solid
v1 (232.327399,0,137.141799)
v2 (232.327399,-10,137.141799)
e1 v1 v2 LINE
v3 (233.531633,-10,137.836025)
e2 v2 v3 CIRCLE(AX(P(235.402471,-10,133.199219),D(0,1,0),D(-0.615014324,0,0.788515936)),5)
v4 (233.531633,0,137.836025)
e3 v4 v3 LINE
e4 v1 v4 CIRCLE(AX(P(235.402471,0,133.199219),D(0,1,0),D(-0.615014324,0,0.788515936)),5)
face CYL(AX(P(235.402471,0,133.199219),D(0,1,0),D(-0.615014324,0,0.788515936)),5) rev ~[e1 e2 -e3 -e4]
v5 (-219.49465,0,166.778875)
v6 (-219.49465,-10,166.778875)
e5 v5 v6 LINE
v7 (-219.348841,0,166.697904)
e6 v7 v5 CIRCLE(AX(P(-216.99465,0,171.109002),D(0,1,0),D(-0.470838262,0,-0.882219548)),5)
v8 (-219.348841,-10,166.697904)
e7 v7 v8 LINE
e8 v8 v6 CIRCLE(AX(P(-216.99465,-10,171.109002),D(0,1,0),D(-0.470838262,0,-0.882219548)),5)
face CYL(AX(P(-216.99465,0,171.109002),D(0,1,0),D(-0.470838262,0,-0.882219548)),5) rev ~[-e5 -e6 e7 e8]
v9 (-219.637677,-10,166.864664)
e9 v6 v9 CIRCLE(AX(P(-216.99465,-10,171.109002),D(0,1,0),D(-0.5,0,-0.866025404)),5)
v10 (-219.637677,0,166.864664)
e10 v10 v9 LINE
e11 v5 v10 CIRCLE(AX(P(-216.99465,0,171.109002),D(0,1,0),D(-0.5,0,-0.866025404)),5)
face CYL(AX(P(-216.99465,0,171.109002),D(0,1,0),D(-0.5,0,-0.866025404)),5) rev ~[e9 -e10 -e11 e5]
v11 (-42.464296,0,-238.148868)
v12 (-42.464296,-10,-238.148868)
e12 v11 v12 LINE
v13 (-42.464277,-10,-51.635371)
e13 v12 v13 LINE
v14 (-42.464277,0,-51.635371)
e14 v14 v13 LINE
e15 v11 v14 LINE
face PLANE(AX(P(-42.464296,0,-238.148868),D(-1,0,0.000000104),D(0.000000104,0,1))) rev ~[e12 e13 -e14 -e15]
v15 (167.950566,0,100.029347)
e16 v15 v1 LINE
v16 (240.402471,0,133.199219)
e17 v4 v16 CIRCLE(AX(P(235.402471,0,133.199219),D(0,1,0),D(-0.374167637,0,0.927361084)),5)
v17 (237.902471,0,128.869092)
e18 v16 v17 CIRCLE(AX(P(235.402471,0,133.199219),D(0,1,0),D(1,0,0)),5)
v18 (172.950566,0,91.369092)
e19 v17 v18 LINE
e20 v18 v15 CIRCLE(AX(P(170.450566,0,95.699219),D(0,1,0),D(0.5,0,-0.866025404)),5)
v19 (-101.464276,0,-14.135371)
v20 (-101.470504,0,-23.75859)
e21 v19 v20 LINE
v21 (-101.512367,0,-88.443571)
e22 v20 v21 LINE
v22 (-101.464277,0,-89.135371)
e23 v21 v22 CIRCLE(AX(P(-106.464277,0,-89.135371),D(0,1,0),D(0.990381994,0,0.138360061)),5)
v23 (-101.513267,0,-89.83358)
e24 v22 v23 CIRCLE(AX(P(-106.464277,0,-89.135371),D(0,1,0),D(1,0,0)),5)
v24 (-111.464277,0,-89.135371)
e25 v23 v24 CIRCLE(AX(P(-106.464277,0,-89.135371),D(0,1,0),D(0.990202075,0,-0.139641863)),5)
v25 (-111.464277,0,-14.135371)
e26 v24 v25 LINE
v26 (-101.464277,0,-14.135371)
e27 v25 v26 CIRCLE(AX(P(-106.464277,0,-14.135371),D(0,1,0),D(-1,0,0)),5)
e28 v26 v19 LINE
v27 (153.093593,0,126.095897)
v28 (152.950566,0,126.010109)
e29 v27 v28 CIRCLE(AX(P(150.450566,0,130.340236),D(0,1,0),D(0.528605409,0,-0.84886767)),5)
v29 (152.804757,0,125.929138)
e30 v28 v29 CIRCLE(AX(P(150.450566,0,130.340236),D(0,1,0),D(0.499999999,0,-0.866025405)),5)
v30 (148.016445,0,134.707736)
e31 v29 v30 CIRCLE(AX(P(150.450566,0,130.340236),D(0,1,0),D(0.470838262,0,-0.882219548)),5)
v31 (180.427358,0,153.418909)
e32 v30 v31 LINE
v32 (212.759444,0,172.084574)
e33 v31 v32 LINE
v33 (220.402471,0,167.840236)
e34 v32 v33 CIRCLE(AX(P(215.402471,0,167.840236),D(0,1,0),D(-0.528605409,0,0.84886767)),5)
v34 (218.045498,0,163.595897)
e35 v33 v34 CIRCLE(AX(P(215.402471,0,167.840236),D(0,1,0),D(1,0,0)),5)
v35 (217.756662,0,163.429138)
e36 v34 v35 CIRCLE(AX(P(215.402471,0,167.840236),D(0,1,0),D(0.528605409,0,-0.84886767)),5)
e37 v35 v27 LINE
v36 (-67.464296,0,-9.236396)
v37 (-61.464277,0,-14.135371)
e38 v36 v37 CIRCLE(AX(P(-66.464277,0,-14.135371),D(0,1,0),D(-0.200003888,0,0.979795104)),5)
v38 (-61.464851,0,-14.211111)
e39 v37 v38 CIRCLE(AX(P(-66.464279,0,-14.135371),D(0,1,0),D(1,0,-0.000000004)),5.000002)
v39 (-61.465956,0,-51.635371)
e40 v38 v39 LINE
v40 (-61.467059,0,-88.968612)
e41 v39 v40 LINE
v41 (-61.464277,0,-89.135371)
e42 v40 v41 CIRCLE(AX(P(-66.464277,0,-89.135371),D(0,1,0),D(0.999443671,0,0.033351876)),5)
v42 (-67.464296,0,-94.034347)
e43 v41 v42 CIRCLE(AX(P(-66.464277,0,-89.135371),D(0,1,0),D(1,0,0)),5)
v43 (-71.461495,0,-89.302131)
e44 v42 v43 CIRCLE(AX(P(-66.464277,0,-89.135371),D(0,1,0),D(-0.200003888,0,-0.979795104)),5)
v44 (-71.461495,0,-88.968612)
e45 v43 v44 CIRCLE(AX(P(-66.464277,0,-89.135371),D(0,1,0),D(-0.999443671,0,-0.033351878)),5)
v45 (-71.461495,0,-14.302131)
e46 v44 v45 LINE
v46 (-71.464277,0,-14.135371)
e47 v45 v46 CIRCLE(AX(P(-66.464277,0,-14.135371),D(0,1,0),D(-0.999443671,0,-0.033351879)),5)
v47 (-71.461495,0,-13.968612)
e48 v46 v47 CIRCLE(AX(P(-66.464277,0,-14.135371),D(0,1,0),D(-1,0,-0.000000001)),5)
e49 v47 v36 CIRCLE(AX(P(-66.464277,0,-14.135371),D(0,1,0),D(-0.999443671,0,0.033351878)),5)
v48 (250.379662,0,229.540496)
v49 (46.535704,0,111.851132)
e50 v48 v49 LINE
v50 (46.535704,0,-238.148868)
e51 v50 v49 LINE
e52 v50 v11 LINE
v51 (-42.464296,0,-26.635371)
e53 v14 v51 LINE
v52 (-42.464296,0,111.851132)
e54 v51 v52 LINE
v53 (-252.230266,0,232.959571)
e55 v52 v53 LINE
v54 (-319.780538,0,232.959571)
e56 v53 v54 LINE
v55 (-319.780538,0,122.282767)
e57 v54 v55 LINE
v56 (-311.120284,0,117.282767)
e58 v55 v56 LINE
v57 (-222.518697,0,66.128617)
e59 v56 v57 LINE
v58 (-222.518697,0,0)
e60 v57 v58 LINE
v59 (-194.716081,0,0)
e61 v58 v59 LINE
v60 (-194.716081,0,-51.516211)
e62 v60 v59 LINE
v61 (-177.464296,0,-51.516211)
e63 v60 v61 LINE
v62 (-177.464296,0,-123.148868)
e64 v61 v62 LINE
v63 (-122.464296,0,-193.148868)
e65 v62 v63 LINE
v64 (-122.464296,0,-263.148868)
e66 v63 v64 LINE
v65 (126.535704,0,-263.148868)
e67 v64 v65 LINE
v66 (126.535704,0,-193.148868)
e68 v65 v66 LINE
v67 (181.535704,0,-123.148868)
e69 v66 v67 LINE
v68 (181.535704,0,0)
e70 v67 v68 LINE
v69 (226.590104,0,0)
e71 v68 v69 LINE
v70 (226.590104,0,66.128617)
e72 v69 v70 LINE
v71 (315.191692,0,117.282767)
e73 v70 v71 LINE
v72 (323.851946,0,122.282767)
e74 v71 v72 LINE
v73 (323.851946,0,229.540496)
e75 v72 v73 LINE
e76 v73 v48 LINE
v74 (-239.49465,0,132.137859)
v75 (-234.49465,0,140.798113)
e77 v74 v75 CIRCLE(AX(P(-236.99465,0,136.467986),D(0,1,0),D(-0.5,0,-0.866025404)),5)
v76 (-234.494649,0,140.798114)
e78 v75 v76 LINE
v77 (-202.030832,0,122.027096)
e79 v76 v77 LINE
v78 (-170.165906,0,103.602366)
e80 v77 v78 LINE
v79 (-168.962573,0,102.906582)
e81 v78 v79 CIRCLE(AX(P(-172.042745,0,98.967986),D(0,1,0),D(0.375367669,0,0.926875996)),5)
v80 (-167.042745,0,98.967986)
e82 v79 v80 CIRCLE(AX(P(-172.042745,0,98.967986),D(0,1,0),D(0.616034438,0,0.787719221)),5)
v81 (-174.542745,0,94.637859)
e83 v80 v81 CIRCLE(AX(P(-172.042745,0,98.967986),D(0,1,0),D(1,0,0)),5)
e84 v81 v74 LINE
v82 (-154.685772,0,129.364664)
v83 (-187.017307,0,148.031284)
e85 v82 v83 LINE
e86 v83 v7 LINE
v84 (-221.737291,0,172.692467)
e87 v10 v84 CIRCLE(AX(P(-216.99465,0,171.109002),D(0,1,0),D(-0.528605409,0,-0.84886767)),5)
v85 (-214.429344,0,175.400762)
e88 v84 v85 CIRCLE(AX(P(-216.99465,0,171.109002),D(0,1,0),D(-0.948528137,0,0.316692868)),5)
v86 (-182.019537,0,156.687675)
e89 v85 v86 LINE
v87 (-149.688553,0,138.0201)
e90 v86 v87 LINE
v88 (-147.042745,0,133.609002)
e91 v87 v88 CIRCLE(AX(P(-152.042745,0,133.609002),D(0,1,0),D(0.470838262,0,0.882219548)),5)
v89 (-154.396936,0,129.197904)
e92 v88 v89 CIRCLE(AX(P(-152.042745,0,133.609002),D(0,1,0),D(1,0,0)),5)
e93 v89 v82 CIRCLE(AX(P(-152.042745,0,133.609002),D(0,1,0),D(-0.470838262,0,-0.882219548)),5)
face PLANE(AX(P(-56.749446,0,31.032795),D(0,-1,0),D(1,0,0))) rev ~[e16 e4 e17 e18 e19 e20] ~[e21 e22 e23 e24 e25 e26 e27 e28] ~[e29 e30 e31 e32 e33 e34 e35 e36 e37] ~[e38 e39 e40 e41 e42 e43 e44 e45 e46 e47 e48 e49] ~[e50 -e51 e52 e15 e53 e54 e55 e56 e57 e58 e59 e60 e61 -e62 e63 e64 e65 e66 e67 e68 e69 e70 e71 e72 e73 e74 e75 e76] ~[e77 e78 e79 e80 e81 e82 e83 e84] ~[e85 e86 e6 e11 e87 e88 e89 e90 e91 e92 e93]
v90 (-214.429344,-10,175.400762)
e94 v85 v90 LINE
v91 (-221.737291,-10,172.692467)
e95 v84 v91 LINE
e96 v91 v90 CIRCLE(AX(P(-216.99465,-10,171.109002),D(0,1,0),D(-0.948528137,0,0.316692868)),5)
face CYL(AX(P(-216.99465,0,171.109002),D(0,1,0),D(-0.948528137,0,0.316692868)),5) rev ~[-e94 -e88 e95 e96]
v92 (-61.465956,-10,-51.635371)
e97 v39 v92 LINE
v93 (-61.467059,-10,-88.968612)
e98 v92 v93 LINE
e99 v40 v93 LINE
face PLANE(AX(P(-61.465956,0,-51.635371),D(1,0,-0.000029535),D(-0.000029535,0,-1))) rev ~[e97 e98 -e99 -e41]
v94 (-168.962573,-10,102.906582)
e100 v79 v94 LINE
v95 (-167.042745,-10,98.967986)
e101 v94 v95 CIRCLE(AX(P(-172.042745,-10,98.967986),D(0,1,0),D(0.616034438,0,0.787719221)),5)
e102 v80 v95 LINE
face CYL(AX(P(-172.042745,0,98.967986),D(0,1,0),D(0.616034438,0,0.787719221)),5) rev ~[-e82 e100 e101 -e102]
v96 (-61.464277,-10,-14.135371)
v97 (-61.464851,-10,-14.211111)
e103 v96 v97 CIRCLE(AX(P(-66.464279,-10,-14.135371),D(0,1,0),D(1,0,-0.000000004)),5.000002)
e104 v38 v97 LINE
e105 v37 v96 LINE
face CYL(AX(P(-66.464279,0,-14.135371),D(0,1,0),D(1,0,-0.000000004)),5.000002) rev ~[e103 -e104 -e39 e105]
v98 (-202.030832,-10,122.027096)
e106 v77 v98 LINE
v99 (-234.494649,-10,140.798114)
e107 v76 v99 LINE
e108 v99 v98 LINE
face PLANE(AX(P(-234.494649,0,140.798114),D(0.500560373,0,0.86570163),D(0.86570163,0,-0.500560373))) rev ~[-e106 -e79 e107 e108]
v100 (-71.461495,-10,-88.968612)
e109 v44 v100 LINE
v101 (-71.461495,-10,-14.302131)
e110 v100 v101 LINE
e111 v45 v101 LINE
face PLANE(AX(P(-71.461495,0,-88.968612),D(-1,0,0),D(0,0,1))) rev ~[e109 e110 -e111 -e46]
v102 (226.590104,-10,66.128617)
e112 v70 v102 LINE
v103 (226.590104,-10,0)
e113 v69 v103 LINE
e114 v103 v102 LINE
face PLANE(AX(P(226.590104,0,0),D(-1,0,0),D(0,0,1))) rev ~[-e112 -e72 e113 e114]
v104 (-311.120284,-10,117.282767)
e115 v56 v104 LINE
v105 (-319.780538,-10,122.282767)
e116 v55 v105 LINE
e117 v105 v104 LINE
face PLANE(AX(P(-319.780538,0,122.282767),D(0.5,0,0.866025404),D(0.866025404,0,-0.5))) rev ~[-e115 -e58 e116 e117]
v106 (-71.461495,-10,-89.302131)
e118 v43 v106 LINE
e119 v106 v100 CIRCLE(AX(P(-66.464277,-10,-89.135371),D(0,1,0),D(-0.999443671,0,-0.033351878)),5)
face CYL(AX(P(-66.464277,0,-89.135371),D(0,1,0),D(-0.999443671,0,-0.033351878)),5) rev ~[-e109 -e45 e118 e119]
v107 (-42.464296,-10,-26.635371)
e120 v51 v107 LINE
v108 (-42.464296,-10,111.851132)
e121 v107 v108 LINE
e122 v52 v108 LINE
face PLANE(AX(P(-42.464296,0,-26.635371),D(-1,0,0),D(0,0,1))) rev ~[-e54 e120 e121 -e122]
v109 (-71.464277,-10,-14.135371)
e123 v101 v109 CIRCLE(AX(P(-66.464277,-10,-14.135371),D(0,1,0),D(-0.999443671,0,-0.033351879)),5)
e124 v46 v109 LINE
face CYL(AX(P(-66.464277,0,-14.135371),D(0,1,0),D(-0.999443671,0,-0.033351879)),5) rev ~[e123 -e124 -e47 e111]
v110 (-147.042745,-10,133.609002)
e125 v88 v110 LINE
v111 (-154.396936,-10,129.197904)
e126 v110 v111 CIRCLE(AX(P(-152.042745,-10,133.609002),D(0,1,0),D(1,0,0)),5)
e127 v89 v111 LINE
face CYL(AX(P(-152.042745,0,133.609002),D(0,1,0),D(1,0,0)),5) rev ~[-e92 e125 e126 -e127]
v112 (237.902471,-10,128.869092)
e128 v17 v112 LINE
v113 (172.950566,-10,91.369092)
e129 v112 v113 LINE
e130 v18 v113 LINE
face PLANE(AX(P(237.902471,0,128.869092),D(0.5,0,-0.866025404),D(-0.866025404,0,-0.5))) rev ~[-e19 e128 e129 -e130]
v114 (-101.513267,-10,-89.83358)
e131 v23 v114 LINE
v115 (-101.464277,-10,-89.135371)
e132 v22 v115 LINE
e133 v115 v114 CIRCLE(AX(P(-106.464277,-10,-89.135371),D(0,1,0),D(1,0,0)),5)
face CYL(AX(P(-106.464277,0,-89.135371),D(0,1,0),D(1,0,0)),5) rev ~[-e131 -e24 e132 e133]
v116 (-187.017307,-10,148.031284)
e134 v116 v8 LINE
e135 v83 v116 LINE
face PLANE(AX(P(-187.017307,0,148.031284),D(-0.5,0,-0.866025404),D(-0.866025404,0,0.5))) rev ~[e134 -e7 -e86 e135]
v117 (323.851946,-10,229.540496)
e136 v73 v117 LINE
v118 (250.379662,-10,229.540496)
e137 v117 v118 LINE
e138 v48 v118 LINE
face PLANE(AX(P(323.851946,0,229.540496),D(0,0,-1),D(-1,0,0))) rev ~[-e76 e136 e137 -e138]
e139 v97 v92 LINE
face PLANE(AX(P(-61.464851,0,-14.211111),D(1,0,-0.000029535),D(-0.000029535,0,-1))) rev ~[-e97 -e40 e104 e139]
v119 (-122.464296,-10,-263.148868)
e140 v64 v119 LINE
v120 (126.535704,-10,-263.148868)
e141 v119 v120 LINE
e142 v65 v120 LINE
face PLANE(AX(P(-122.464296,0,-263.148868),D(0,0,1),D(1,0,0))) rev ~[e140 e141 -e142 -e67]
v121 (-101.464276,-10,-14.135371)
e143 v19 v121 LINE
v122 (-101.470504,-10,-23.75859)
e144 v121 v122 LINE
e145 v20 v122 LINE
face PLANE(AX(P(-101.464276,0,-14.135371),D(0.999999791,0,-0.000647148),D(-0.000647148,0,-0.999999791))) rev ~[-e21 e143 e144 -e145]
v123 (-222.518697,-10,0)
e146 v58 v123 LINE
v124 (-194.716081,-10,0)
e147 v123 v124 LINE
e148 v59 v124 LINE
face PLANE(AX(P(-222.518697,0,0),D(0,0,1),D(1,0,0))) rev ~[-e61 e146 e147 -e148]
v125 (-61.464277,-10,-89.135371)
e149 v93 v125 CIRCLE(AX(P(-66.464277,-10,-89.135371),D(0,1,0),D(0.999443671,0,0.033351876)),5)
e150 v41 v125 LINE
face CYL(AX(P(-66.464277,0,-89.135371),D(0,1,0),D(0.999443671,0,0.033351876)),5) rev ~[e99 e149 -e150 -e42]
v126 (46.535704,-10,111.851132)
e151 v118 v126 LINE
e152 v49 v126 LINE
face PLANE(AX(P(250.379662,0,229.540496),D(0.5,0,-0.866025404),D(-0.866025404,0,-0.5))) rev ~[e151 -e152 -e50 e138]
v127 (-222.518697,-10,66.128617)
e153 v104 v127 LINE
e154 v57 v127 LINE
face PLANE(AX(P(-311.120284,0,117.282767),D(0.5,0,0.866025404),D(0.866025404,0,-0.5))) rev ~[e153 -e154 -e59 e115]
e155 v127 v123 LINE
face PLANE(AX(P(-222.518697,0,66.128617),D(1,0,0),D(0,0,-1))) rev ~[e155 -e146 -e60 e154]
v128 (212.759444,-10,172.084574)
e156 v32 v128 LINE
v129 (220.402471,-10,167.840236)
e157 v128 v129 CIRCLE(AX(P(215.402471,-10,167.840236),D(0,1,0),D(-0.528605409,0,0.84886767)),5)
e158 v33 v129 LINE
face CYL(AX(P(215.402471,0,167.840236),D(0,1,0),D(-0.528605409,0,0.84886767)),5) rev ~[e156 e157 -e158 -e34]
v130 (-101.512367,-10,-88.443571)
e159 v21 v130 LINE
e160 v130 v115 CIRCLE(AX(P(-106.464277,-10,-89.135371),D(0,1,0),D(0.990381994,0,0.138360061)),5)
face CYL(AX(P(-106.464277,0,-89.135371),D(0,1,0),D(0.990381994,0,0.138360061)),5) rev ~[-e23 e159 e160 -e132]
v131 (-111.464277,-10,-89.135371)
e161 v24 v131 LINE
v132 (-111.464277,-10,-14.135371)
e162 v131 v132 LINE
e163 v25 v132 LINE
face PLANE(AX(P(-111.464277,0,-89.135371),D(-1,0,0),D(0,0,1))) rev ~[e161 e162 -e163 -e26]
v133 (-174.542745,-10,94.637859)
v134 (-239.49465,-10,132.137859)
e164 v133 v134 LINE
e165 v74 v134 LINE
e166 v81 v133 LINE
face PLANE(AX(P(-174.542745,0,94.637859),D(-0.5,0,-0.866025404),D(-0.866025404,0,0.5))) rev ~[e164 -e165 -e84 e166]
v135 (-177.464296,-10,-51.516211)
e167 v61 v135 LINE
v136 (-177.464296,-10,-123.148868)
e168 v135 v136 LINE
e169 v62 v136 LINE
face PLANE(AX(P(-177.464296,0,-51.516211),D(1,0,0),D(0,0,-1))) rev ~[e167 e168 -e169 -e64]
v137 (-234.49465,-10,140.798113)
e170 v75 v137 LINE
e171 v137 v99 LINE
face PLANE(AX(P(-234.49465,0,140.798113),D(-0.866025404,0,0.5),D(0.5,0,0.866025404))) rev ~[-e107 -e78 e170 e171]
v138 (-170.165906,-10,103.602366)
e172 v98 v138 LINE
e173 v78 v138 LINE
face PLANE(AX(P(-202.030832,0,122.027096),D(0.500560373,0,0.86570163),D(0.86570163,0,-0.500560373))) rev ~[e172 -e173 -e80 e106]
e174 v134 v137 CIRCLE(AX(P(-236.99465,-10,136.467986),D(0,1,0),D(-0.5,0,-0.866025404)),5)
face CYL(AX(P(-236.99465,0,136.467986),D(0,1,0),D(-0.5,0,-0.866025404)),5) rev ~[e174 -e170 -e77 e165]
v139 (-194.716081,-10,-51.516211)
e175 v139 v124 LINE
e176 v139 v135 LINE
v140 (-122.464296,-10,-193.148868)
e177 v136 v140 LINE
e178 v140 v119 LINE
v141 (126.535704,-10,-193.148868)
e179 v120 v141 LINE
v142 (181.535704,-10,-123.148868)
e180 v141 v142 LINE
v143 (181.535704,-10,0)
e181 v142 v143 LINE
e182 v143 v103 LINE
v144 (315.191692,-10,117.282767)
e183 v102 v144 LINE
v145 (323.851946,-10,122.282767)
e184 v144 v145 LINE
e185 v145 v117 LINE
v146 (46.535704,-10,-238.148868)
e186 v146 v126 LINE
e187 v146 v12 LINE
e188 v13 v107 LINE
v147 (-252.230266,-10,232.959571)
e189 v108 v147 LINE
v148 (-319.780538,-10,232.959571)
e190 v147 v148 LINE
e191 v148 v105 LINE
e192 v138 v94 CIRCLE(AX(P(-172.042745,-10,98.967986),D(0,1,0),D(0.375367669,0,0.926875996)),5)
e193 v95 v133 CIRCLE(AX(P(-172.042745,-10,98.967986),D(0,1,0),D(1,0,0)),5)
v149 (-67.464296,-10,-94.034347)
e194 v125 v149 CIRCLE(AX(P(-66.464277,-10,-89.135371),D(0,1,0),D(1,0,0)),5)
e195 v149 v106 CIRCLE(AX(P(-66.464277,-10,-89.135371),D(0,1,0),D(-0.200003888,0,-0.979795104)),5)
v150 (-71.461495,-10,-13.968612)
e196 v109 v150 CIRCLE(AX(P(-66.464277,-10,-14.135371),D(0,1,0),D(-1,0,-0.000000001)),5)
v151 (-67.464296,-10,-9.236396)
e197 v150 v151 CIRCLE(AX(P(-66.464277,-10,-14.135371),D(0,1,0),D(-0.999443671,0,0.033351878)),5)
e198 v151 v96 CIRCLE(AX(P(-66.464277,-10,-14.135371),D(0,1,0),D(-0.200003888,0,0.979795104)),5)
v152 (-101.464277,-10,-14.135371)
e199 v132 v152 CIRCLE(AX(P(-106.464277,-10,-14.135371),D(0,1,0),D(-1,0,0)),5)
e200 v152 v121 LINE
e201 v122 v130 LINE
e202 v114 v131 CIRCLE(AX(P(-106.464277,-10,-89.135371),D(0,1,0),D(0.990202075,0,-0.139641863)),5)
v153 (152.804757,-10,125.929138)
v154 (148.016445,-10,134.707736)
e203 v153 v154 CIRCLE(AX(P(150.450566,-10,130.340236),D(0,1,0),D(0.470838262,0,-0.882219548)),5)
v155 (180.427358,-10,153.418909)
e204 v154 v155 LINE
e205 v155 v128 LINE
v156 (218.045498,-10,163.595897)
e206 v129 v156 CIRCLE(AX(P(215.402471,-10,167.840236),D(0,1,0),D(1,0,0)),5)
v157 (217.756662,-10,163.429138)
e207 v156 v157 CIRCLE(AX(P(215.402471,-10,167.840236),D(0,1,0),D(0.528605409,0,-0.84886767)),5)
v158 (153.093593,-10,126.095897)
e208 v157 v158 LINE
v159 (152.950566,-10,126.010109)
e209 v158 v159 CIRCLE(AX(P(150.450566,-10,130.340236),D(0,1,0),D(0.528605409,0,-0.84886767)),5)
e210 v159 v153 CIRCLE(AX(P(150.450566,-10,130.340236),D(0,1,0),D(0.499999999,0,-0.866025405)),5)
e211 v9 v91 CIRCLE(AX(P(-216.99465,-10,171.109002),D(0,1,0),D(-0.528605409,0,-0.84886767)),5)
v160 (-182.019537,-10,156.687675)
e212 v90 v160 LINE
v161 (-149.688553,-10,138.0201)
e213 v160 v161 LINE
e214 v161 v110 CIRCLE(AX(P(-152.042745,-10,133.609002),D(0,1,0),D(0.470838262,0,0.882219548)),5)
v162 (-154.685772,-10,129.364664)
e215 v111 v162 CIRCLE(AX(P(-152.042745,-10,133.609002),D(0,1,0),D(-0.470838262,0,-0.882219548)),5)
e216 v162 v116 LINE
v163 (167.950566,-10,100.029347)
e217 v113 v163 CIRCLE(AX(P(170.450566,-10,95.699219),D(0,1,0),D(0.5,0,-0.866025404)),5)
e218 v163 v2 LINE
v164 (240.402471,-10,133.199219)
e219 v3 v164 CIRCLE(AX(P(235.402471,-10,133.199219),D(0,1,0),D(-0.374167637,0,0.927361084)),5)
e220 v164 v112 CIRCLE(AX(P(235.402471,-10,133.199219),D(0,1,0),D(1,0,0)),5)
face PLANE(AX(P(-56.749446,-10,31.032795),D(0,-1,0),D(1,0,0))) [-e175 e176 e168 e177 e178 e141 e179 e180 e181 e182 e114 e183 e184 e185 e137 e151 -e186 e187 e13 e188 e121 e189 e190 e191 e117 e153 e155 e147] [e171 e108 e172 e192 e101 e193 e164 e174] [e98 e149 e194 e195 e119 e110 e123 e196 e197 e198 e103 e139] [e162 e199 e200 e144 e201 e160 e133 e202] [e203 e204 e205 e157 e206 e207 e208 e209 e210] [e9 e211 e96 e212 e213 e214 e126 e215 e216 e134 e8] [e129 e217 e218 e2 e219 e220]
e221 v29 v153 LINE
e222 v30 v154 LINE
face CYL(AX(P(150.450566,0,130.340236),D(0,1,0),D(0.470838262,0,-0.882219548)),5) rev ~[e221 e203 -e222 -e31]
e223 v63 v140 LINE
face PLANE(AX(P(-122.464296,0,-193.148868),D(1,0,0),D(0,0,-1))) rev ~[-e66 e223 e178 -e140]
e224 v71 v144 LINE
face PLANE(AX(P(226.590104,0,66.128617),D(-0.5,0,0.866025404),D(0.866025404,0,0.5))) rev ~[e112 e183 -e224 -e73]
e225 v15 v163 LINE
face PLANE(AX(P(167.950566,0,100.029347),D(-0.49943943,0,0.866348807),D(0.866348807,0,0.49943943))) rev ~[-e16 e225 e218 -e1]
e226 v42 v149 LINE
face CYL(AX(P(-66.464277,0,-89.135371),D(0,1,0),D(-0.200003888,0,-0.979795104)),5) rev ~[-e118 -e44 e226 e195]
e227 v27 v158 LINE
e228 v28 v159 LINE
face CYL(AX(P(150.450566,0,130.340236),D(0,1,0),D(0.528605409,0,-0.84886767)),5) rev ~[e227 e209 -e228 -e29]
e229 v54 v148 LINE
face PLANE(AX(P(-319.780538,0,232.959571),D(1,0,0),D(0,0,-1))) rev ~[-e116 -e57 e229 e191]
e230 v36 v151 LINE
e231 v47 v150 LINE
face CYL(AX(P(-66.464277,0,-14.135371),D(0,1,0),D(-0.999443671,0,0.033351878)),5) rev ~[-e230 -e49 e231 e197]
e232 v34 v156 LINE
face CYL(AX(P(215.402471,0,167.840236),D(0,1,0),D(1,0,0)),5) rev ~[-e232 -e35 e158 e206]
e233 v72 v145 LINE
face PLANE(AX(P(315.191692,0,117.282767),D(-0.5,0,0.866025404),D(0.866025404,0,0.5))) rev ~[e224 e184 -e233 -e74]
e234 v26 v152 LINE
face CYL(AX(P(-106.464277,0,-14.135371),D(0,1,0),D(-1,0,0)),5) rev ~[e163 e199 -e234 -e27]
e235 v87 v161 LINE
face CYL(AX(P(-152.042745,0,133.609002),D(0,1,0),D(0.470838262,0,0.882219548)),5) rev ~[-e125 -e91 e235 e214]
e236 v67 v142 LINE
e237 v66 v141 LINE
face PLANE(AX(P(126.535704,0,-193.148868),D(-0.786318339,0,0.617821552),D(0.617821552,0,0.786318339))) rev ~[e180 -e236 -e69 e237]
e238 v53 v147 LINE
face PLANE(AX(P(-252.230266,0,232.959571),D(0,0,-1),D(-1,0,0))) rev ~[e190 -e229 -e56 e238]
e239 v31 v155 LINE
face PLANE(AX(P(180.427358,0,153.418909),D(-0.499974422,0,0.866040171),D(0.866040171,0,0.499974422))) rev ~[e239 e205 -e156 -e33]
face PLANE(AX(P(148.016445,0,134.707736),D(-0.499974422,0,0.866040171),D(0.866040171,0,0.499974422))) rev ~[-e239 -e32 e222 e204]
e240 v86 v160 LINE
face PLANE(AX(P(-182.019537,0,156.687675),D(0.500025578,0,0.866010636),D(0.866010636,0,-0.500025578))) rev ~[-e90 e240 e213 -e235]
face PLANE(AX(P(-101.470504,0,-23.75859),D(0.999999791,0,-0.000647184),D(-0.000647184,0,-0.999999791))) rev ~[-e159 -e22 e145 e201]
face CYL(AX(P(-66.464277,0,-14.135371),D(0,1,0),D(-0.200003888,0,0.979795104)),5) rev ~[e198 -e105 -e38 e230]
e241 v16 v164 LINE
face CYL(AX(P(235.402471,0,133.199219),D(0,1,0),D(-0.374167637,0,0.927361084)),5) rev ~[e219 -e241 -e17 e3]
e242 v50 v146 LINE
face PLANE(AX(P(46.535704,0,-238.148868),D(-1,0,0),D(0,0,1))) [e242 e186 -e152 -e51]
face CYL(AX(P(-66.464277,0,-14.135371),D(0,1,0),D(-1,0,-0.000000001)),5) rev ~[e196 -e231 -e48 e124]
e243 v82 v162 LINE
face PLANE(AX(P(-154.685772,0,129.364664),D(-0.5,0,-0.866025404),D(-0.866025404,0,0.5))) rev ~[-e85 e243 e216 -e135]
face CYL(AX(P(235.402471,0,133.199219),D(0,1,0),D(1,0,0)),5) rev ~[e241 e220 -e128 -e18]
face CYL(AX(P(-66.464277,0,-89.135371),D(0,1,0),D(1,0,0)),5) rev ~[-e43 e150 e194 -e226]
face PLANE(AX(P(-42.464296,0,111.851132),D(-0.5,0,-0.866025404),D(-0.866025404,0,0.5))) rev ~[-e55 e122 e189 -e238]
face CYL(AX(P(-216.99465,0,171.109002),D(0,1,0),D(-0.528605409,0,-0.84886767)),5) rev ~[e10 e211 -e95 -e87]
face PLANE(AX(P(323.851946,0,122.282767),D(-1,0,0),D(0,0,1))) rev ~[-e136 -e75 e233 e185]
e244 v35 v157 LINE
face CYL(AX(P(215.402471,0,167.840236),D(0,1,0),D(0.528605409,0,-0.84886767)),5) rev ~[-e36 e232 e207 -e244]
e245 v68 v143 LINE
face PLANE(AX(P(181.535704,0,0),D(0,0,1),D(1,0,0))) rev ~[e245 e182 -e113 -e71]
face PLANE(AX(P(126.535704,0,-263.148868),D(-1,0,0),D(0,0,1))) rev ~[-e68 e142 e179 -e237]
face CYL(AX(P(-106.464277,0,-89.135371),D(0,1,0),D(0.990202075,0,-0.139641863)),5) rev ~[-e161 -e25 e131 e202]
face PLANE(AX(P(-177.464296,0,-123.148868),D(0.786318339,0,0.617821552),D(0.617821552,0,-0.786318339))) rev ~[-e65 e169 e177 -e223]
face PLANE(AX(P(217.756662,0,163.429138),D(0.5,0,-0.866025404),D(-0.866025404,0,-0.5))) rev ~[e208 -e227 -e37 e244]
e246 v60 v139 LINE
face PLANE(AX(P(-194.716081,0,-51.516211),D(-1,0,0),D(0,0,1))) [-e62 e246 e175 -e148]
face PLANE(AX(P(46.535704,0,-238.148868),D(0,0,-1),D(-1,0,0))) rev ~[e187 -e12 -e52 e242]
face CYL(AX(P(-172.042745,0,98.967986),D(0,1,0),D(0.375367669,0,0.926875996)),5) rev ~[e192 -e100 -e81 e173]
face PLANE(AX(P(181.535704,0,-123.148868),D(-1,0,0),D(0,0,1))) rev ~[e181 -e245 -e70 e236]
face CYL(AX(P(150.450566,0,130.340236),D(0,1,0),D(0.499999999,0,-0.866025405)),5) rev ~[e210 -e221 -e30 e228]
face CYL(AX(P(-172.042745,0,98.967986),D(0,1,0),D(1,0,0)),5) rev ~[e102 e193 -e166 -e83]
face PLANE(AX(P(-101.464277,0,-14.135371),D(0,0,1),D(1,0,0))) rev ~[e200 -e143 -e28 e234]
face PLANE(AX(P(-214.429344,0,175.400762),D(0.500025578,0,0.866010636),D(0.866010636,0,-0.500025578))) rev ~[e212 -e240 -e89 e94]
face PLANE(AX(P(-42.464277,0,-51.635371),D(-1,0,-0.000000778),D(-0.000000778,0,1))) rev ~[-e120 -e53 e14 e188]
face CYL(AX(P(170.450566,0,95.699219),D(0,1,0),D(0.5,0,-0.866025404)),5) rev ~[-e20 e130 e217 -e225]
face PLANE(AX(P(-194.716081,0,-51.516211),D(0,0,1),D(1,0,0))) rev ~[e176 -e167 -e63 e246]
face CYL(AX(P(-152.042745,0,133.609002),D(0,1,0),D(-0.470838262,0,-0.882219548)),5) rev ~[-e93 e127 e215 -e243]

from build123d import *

# Parameters (mm, degrees)
F0_W     = 139
F0_H     = 20
F0_W_2   = 5
F0_H_2   = 350
F0_W_3   = 17.2517846753
F0_H_3   = 51.5162105877
F1_DEPTH = 10


# Not quite as in the source:
# - ends of sketch curves that miss each other by under 0.0002 mm in the source are joined


with BuildPart() as f1:
    # F0 (on Front) → F1 (new body)
    with BuildSketch(Plane.XZ):
        with BuildLine():
            Line((-52.4642963479, 111.8511321076), (-67.4642963479, 111.8511321076))
            Line((-67.4642963479, 111.8511321076), (-67.4642963479, 97.4173753779))
            Line((-67.4642963479, 97.4173753779), (-67.4642963479, -9.2363956308))
            ThreePointArc((-67.4642963479, -9.2363956308), (-63.3020069333, -10.2623815288), (-61.4642769098, -14.1353711486))
            ThreePointArc((-61.4642769098, -14.1353711486), (-61.4644203334, -14.1732421769), (-61.4648505957, -14.2111110326))
            Line((-61.4648505957, -14.2111110326), (-61.4659559185, -51.6353711486))
            Line((-61.4659559185, -51.6353711486), (-47.4642963479, -51.6353711486))
            Line((-47.4642963479, -51.6353711486), (-47.4642963479, 111.8511321076))
            Line((-47.4642963479, 111.8511321076), (-52.4642963479, 111.8511321076))
        make_face()
        Polygon((-67.4642963479, 97.4173753779), (-67.4642963479, 111.8511321076), (-52.4642963479, 111.8511321076), (-254.7302662373, 228.6294442711), (-264.7302662373, 211.3089361954), (-179.0455194088, 161.8388245486), align=None)
        with BuildLine():
            Line((-67.4642963479, -9.2363956308), (-67.4642963479, 97.4173753779))
            Line((-67.4642963479, 97.4173753779), (-179.0455194088, 161.8388245486))
            Line((-179.0455194088, 161.8388245486), (-182.0195368853, 156.6876751766))
            Line((-182.0195368853, 156.6876751766), (-149.6885534271, 138.0200999612))
            ThreePointArc((-149.6885534271, 138.0200999612), (-147.754915652, 136.1808734705), (-147.0427447391, 133.6090022218))
            ThreePointArc((-147.0427447391, 133.6090022218), (-149.4708734904, 129.3211731347), (-154.3969360511, 129.1979044824))
            ThreePointArc((-154.3969360511, 129.1979044824), (-154.5427447391, 129.2788752028), (-154.685771784, 129.3646638705))
            Line((-154.685771784, 129.3646638705), (-187.0173065595, 148.0312841764))
            Line((-187.0173065595, 148.0312841764), (-202.0308315575, 122.0270960791))
            Line((-202.0308315575, 122.0270960791), (-170.1659063917, 103.6023660524))
            ThreePointArc((-170.1659063917, 103.6023660524), (-169.5399428743, 103.2964942228), (-168.9625725467, 102.9065821737))
            ThreePointArc((-168.9625725467, 102.9065821737), (-167.5482558381, 101.1587780548), (-167.0427447391, 98.9679860704))
            ThreePointArc((-167.0427447391, 98.9679860704), (-169.5427447391, 94.6378590515), (-174.5427447391, 94.6378590515))
            Line((-174.5427447391, 94.6378590515), (-207.018697381, 113.3878590515))
            Line((-207.018697381, 113.3878590515), (-222.518697381, 86.5410715342))
            Line((-222.518697381, 86.5410715342), (-222.518697381, 66.1286172816))
            Line((-222.518697381, 66.1286172816), (-222.518697381, 46.1286172816))
            Line((-222.518697381, 46.1286172816), (-177.4642963479, 20.116446717))
            Line((-177.4642963479, 20.116446717), (-111.4642769098, -17.9886822721))
            Line((-111.4642769098, -17.9886822721), (-111.4642769098, -14.1353711486))
            ThreePointArc((-111.4642769098, -14.1353711486), (-106.4642769098, -9.1353711486), (-101.4642769098, -14.1353711486))
            Line((-101.4642769098, -14.1353711486), (-71.4642769098, -14.1353711486))
            ThreePointArc((-71.4642769098, -14.1353711486), (-71.4635814507, -14.0519798555), (-71.4614952667, -13.9686117605))
            ThreePointArc((-71.4614952667, -13.9686117605), (-70.283986672, -10.9089462954), (-67.4642963479, -9.2363956308))
        make_face()
        Polygon((-254.7302662373, 228.6294442711), (-52.4642963479, 111.8511321076), (-47.4642963479, 111.8511321076), (-42.4642963479, 111.8511321076), (-252.2302662373, 232.95957129), align=None)
        with BuildLine():
            Line((-182.0195368853, 156.6876751766), (-179.0455194088, 161.8388245486))
            Line((-179.0455194088, 161.8388245486), (-264.7302662373, 211.3089361954))
            Line((-264.7302662373, 211.3089361954), (-302.2302662373, 232.95957129))
            Line((-302.2302662373, 232.95957129), (-319.7805383214, 232.95957129))
            Line((-319.7805383214, 232.95957129), (-319.7805383214, 122.2827673304))
            Line((-319.7805383214, 122.2827673304), (-311.1202842835, 117.2827673304))
            Line((-311.1202842835, 117.2827673304), (-222.518697381, 66.1286172816))
            Line((-222.518697381, 66.1286172816), (-222.518697381, 86.5410715342))
            Line((-222.518697381, 86.5410715342), (-207.018697381, 113.3878590515))
            Line((-207.018697381, 113.3878590515), (-239.4946500229, 132.1378590515))
            ThreePointArc((-239.4946500229, 132.1378590515), (-241.3247770419, 138.9679860704), (-234.4946500229, 140.7981130893))
            Line((-234.4946500229, 140.7981130893), (-219.4946500229, 166.7788752029))
            ThreePointArc((-219.4946500229, 166.7788752029), (-219.5665212716, 166.8211731347), (-219.6376770678, 166.8646638705))
            ThreePointArc((-219.6376770678, 166.8646638705), (-221.6986741524, 169.4142582916), (-221.7372907101, 172.6924665608))
            ThreePointArc((-221.7372907101, 172.6924665608), (-218.7321520995, 175.7974013658), (-214.4293442023, 175.4007624721))
            Line((-214.4293442023, 175.4007624721), (-182.0195368853, 156.6876751766))
        make_face()
        Polygon((-42.4642963479, 111.8511321076), (-47.4642963479, 111.8511321076), (-47.4642963479, -51.6353711486), (-42.4642769098, -51.6353711486), (-42.4642963479, -26.6353711486), align=None)
        Polygon((-264.7302662373, 211.3089361954), (-254.7302662373, 228.6294442711), (-262.2302662373, 232.95957129), (-302.2302662373, 232.95957129), align=None)
        Polygon((-262.2302662373, 232.95957129), (-254.7302662373, 228.6294442711), (-252.2302662373, 232.95957129), align=None)
        Polygon((-42.4642769098, -51.6353711486), (-47.4642963479, -51.6353711486), (-47.4642963479, -238.1488678924), (-42.4642963479, -238.1488678924), align=None)
        with BuildLine():
            Line((-47.4642963479, -238.1488678924), (-47.4642963479, -51.6353711486))
            Line((-47.4642963479, -51.6353711486), (-61.4659559185, -51.6353711486))
            Line((-61.4659559185, -51.6353711486), (-61.4670585529, -88.9686117605))
            ThreePointArc((-61.4670585529, -88.9686117605), (-61.464972369, -89.0519798555), (-61.4642769098, -89.1353711486))
            ThreePointArc((-61.4642769098, -89.1353711486), (-63.3020069333, -93.0083607684), (-67.4642963479, -94.0343466663))
            Line((-67.4642963479, -94.0343466663), (-67.4642963479, -98.048845338))
            Line((-67.4642963479, -98.048845338), (-67.4642963479, -123.1488678924))
            Line((-67.4642963479, -123.1488678924), (-67.4642963479, -238.1488678924))
            Line((-67.4642963479, -238.1488678924), (-47.4642963479, -238.1488678924))
        make_face()
        with BuildLine():
            ThreePointArc((-71.4614952667, -14.3021305367), (-71.4635814507, -14.2187624417), (-71.4642769098, -14.1353711486))
            Line((-71.4642769098, -14.1353711486), (-101.4642762117, -14.1353711486))
            Line((-101.4642762117, -14.1353711486), (-101.4705038559, -23.758589835))
            Line((-101.4705038559, -23.758589835), (-71.4614952667, -41.0842990221))
            Line((-71.4614952667, -41.0842990221), (-71.4614952667, -14.3021305367))
        make_face()
        Polygon((-42.4642963479, -238.1488678924), (-47.4642963479, -238.1488678924), (-67.4642963479, -238.1488678924), (-67.4642963479, -243.1488678924), (71.5357036521, -243.1488678924), (71.5357036521, -238.1488678924), (51.5357036521, -238.1488678924), (46.5357036521, -238.1488678924), align=None)
        Polygon((-67.4642963479, -243.1488678924), (-67.4642963479, -238.1488678924), (-67.4642963479, -123.1488678924), (-177.4642963479, -123.1488678924), (-122.4642963479, -193.1488678924), (-67.4642963479, -263.1488678924), align=None)
        with BuildLine():
            Line((-71.4614952667, -88.9686117605), (-71.4614952667, -41.0842990221))
            Line((-71.4614952667, -41.0842990221), (-101.4705038559, -23.758589835))
            Line((-101.4705038559, -23.758589835), (-101.5123669409, -88.4435708452))
            ThreePointArc((-101.5123669409, -88.4435708452), (-101.4763139065, -88.7886362676), (-101.4642769098, -89.1353711486))
            ThreePointArc((-101.4642769098, -89.1353711486), (-101.4765393523, -89.4853340862), (-101.5132665329, -89.8335804636))
            ThreePointArc((-101.5132665329, -89.8335804636), (-106.8142398474, -94.1231087061), (-111.4642769098, -89.1353711486))
            Line((-111.4642769098, -89.1353711486), (-111.4642769098, -17.9886822721))
            Line((-111.4642769098, -17.9886822721), (-177.4642963479, 20.116446717))
            Line((-177.4642963479, 20.116446717), (-177.4642963479, 0))
            Line((-177.4642963479, 0), (-177.4642963479, -51.5162105877))
            Line((-177.4642963479, -51.5162105877), (-177.4642963479, -123.1488678924))
            Line((-177.4642963479, -123.1488678924), (-67.4642963479, -123.1488678924))
            Line((-67.4642963479, -123.1488678924), (-67.4642963479, -98.048845338))
            Line((-67.4642963479, -98.048845338), (-67.4642963479, -94.0343466663))
            ThreePointArc((-67.4642963479, -94.0343466663), (-70.283986672, -92.3617960018), (-71.4614952667, -89.3021305367))
            ThreePointArc((-71.4614952667, -89.3021305367), (-71.4642769098, -89.1353711486), (-71.4614952667, -88.9686117605))
        make_face()
        with BuildLine():
            Line((-202.0308315575, 122.0270960791), (-187.0173065595, 148.0312841764))
            Line((-187.0173065595, 148.0312841764), (-219.348841335, 166.6979044824))
            ThreePointArc((-219.348841335, 166.6979044824), (-219.4220833151, 166.7377818416), (-219.4946500229, 166.7788752029))
            Line((-219.4946500229, 166.7788752029), (-234.4946494994, 140.7981139961))
            Line((-234.4946494994, 140.7981139961), (-202.0308315575, 122.0270960791))
        make_face()
        with Locations((2.0357036521, -253.1488678924)):
            Rectangle(F0_W, F0_H)
        with Locations((49.0357036521, -63.1488678924)):
            Rectangle(F0_W_2, F0_H_2)
        Polygon((-122.4642963479, -263.1488678924), (-67.4642963479, -263.1488678924), (-122.4642963479, -193.1488678924), align=None)
        Polygon((71.5357036521, -238.1488678924), (71.5357036521, -243.1488678924), (71.5357036521, -263.1488678924), (126.5357036521, -193.1488678924), (181.5357036521, -123.1488678924), (71.5357036521, -123.1488678924), align=None)
        Polygon((51.5357036521, 111.8511321076), (51.5357036521, -238.1488678924), (71.5357036521, -238.1488678924), (71.5357036521, -123.1488678924), (71.5357036521, -43.3920828938), (71.5357036521, 97.4173753779), (71.5357036521, 111.8511321076), (56.5357036521, 111.8511321076), align=None)
        Polygon((250.3796616473, 229.5404961288), (46.5357036521, 111.8511321076), (51.5357036521, 111.8511321076), (56.5357036521, 111.8511321076), (252.8796616473, 225.2103691099), align=None)
        Polygon((-177.4642963479, 0), (-177.4642963479, 20.116446717), (-222.518697381, 46.1286172816), (-222.518697381, 0), (-194.7160810232, 0), align=None)
        with Locations((-186.0901886856, -25.7581052938)):
            Rectangle(F0_W_3, F0_H_3)
        Polygon((126.5357036521, -193.1488678924), (71.5357036521, -263.1488678924), (126.5357036521, -263.1488678924), align=None)
        Polygon((260.3796616473, 229.5404961288), (250.3796616473, 229.5404961288), (252.8796616473, 225.2103691099), align=None)
        Polygon((71.5357036521, -43.3920828938), (71.5357036521, -123.1488678924), (181.5357036521, -123.1488678924), (181.5357036521, 0), (181.5357036521, 20.116446717), align=None)
        Polygon((252.8796616473, 225.2103691099), (56.5357036521, 111.8511321076), (71.5357036521, 111.8511321076), (71.5357036521, 97.4173753779), (177.45381959, 158.5692281267), (262.8796616473, 207.8898610342), align=None)
        Polygon((260.3796616473, 229.5404961288), (252.8796616473, 225.2103691099), (262.8796616473, 207.8898610342), (300.3796616473, 229.5404961288), align=None)
        Polygon((71.5357036521, 97.4173753779), (71.5357036521, -43.3920828938), (181.5357036521, 20.116446717), (226.5901036521, 46.1286166852), (226.5901036521, 66.1286166852), (315.1916915876, 117.2827673304), (262.8796616473, 207.8898610342), (177.45381959, 158.5692281267), align=None)
        with BuildLine():
            ThreePointArc((172.950565815, 91.3690924644), (166.120438796, 93.1992194834), (167.950565815, 100.0293465023))
            Line((167.950565815, 100.0293465023), (232.3273994773, 137.141799162))
            ThreePointArc((232.3273994773, 137.141799162), (232.9052740107, 137.5309635551), (233.5316329143, 137.8360249017))
            ThreePointArc((233.5316329143, 137.8360249017), (238.1994166719, 137.3437454468), (240.4024710988, 133.1992194834))
            ThreePointArc((240.4024710988, 133.1992194834), (239.7325981177, 130.6992194834), (237.9024710988, 128.8690924644))
            Line((237.9024710988, 128.8690924644), (172.950565815, 91.3690924644))
        make_face(mode=Mode.SUBTRACT)
        with BuildLine():
            Line((148.0164453216, 134.7077357691), (180.4273579612, 153.4189085895))
            Line((180.4273579612, 153.4189085895), (212.7594440539, 172.084573986))
            ThreePointArc((212.7594440539, 172.084573986), (217.829904391, 172.2114560149), (220.4024710988, 167.8402356347))
            ThreePointArc((220.4024710988, 167.8402356347), (219.773691479, 165.4128023426), (218.0454981437, 163.5958972835))
            ThreePointArc((218.0454981437, 163.5958972835), (217.9024710988, 163.5101086158), (217.7566624108, 163.4291378954))
            Line((217.7566624108, 163.4291378954), (153.0935928598, 126.0958972835))
            ThreePointArc((153.0935928598, 126.0958972835), (153.0224370637, 126.0524065477), (152.950565815, 126.0101086158))
            ThreePointArc((152.950565815, 126.0101086158), (152.8779991071, 125.9690152546), (152.804757127, 125.9291378954))
            ThreePointArc((152.804757127, 125.9291378954), (146.061084943, 127.945980495), (148.0164453216, 134.7077357691))
        make_face(mode=Mode.SUBTRACT)
        Polygon((300.3796616473, 229.5404961288), (262.8796616473, 207.8898610342), (315.1916915876, 117.2827673304), (323.8519456255, 122.2827673304), (323.8519456255, 229.5404961288), align=None)
        Polygon((181.5357036521, 20.116446717), (181.5357036521, 0), (226.5901036521, 0), (226.5901036521, 46.1286166852), align=None)
    extrude(amount=F1_DEPTH)


solid = f1.part
